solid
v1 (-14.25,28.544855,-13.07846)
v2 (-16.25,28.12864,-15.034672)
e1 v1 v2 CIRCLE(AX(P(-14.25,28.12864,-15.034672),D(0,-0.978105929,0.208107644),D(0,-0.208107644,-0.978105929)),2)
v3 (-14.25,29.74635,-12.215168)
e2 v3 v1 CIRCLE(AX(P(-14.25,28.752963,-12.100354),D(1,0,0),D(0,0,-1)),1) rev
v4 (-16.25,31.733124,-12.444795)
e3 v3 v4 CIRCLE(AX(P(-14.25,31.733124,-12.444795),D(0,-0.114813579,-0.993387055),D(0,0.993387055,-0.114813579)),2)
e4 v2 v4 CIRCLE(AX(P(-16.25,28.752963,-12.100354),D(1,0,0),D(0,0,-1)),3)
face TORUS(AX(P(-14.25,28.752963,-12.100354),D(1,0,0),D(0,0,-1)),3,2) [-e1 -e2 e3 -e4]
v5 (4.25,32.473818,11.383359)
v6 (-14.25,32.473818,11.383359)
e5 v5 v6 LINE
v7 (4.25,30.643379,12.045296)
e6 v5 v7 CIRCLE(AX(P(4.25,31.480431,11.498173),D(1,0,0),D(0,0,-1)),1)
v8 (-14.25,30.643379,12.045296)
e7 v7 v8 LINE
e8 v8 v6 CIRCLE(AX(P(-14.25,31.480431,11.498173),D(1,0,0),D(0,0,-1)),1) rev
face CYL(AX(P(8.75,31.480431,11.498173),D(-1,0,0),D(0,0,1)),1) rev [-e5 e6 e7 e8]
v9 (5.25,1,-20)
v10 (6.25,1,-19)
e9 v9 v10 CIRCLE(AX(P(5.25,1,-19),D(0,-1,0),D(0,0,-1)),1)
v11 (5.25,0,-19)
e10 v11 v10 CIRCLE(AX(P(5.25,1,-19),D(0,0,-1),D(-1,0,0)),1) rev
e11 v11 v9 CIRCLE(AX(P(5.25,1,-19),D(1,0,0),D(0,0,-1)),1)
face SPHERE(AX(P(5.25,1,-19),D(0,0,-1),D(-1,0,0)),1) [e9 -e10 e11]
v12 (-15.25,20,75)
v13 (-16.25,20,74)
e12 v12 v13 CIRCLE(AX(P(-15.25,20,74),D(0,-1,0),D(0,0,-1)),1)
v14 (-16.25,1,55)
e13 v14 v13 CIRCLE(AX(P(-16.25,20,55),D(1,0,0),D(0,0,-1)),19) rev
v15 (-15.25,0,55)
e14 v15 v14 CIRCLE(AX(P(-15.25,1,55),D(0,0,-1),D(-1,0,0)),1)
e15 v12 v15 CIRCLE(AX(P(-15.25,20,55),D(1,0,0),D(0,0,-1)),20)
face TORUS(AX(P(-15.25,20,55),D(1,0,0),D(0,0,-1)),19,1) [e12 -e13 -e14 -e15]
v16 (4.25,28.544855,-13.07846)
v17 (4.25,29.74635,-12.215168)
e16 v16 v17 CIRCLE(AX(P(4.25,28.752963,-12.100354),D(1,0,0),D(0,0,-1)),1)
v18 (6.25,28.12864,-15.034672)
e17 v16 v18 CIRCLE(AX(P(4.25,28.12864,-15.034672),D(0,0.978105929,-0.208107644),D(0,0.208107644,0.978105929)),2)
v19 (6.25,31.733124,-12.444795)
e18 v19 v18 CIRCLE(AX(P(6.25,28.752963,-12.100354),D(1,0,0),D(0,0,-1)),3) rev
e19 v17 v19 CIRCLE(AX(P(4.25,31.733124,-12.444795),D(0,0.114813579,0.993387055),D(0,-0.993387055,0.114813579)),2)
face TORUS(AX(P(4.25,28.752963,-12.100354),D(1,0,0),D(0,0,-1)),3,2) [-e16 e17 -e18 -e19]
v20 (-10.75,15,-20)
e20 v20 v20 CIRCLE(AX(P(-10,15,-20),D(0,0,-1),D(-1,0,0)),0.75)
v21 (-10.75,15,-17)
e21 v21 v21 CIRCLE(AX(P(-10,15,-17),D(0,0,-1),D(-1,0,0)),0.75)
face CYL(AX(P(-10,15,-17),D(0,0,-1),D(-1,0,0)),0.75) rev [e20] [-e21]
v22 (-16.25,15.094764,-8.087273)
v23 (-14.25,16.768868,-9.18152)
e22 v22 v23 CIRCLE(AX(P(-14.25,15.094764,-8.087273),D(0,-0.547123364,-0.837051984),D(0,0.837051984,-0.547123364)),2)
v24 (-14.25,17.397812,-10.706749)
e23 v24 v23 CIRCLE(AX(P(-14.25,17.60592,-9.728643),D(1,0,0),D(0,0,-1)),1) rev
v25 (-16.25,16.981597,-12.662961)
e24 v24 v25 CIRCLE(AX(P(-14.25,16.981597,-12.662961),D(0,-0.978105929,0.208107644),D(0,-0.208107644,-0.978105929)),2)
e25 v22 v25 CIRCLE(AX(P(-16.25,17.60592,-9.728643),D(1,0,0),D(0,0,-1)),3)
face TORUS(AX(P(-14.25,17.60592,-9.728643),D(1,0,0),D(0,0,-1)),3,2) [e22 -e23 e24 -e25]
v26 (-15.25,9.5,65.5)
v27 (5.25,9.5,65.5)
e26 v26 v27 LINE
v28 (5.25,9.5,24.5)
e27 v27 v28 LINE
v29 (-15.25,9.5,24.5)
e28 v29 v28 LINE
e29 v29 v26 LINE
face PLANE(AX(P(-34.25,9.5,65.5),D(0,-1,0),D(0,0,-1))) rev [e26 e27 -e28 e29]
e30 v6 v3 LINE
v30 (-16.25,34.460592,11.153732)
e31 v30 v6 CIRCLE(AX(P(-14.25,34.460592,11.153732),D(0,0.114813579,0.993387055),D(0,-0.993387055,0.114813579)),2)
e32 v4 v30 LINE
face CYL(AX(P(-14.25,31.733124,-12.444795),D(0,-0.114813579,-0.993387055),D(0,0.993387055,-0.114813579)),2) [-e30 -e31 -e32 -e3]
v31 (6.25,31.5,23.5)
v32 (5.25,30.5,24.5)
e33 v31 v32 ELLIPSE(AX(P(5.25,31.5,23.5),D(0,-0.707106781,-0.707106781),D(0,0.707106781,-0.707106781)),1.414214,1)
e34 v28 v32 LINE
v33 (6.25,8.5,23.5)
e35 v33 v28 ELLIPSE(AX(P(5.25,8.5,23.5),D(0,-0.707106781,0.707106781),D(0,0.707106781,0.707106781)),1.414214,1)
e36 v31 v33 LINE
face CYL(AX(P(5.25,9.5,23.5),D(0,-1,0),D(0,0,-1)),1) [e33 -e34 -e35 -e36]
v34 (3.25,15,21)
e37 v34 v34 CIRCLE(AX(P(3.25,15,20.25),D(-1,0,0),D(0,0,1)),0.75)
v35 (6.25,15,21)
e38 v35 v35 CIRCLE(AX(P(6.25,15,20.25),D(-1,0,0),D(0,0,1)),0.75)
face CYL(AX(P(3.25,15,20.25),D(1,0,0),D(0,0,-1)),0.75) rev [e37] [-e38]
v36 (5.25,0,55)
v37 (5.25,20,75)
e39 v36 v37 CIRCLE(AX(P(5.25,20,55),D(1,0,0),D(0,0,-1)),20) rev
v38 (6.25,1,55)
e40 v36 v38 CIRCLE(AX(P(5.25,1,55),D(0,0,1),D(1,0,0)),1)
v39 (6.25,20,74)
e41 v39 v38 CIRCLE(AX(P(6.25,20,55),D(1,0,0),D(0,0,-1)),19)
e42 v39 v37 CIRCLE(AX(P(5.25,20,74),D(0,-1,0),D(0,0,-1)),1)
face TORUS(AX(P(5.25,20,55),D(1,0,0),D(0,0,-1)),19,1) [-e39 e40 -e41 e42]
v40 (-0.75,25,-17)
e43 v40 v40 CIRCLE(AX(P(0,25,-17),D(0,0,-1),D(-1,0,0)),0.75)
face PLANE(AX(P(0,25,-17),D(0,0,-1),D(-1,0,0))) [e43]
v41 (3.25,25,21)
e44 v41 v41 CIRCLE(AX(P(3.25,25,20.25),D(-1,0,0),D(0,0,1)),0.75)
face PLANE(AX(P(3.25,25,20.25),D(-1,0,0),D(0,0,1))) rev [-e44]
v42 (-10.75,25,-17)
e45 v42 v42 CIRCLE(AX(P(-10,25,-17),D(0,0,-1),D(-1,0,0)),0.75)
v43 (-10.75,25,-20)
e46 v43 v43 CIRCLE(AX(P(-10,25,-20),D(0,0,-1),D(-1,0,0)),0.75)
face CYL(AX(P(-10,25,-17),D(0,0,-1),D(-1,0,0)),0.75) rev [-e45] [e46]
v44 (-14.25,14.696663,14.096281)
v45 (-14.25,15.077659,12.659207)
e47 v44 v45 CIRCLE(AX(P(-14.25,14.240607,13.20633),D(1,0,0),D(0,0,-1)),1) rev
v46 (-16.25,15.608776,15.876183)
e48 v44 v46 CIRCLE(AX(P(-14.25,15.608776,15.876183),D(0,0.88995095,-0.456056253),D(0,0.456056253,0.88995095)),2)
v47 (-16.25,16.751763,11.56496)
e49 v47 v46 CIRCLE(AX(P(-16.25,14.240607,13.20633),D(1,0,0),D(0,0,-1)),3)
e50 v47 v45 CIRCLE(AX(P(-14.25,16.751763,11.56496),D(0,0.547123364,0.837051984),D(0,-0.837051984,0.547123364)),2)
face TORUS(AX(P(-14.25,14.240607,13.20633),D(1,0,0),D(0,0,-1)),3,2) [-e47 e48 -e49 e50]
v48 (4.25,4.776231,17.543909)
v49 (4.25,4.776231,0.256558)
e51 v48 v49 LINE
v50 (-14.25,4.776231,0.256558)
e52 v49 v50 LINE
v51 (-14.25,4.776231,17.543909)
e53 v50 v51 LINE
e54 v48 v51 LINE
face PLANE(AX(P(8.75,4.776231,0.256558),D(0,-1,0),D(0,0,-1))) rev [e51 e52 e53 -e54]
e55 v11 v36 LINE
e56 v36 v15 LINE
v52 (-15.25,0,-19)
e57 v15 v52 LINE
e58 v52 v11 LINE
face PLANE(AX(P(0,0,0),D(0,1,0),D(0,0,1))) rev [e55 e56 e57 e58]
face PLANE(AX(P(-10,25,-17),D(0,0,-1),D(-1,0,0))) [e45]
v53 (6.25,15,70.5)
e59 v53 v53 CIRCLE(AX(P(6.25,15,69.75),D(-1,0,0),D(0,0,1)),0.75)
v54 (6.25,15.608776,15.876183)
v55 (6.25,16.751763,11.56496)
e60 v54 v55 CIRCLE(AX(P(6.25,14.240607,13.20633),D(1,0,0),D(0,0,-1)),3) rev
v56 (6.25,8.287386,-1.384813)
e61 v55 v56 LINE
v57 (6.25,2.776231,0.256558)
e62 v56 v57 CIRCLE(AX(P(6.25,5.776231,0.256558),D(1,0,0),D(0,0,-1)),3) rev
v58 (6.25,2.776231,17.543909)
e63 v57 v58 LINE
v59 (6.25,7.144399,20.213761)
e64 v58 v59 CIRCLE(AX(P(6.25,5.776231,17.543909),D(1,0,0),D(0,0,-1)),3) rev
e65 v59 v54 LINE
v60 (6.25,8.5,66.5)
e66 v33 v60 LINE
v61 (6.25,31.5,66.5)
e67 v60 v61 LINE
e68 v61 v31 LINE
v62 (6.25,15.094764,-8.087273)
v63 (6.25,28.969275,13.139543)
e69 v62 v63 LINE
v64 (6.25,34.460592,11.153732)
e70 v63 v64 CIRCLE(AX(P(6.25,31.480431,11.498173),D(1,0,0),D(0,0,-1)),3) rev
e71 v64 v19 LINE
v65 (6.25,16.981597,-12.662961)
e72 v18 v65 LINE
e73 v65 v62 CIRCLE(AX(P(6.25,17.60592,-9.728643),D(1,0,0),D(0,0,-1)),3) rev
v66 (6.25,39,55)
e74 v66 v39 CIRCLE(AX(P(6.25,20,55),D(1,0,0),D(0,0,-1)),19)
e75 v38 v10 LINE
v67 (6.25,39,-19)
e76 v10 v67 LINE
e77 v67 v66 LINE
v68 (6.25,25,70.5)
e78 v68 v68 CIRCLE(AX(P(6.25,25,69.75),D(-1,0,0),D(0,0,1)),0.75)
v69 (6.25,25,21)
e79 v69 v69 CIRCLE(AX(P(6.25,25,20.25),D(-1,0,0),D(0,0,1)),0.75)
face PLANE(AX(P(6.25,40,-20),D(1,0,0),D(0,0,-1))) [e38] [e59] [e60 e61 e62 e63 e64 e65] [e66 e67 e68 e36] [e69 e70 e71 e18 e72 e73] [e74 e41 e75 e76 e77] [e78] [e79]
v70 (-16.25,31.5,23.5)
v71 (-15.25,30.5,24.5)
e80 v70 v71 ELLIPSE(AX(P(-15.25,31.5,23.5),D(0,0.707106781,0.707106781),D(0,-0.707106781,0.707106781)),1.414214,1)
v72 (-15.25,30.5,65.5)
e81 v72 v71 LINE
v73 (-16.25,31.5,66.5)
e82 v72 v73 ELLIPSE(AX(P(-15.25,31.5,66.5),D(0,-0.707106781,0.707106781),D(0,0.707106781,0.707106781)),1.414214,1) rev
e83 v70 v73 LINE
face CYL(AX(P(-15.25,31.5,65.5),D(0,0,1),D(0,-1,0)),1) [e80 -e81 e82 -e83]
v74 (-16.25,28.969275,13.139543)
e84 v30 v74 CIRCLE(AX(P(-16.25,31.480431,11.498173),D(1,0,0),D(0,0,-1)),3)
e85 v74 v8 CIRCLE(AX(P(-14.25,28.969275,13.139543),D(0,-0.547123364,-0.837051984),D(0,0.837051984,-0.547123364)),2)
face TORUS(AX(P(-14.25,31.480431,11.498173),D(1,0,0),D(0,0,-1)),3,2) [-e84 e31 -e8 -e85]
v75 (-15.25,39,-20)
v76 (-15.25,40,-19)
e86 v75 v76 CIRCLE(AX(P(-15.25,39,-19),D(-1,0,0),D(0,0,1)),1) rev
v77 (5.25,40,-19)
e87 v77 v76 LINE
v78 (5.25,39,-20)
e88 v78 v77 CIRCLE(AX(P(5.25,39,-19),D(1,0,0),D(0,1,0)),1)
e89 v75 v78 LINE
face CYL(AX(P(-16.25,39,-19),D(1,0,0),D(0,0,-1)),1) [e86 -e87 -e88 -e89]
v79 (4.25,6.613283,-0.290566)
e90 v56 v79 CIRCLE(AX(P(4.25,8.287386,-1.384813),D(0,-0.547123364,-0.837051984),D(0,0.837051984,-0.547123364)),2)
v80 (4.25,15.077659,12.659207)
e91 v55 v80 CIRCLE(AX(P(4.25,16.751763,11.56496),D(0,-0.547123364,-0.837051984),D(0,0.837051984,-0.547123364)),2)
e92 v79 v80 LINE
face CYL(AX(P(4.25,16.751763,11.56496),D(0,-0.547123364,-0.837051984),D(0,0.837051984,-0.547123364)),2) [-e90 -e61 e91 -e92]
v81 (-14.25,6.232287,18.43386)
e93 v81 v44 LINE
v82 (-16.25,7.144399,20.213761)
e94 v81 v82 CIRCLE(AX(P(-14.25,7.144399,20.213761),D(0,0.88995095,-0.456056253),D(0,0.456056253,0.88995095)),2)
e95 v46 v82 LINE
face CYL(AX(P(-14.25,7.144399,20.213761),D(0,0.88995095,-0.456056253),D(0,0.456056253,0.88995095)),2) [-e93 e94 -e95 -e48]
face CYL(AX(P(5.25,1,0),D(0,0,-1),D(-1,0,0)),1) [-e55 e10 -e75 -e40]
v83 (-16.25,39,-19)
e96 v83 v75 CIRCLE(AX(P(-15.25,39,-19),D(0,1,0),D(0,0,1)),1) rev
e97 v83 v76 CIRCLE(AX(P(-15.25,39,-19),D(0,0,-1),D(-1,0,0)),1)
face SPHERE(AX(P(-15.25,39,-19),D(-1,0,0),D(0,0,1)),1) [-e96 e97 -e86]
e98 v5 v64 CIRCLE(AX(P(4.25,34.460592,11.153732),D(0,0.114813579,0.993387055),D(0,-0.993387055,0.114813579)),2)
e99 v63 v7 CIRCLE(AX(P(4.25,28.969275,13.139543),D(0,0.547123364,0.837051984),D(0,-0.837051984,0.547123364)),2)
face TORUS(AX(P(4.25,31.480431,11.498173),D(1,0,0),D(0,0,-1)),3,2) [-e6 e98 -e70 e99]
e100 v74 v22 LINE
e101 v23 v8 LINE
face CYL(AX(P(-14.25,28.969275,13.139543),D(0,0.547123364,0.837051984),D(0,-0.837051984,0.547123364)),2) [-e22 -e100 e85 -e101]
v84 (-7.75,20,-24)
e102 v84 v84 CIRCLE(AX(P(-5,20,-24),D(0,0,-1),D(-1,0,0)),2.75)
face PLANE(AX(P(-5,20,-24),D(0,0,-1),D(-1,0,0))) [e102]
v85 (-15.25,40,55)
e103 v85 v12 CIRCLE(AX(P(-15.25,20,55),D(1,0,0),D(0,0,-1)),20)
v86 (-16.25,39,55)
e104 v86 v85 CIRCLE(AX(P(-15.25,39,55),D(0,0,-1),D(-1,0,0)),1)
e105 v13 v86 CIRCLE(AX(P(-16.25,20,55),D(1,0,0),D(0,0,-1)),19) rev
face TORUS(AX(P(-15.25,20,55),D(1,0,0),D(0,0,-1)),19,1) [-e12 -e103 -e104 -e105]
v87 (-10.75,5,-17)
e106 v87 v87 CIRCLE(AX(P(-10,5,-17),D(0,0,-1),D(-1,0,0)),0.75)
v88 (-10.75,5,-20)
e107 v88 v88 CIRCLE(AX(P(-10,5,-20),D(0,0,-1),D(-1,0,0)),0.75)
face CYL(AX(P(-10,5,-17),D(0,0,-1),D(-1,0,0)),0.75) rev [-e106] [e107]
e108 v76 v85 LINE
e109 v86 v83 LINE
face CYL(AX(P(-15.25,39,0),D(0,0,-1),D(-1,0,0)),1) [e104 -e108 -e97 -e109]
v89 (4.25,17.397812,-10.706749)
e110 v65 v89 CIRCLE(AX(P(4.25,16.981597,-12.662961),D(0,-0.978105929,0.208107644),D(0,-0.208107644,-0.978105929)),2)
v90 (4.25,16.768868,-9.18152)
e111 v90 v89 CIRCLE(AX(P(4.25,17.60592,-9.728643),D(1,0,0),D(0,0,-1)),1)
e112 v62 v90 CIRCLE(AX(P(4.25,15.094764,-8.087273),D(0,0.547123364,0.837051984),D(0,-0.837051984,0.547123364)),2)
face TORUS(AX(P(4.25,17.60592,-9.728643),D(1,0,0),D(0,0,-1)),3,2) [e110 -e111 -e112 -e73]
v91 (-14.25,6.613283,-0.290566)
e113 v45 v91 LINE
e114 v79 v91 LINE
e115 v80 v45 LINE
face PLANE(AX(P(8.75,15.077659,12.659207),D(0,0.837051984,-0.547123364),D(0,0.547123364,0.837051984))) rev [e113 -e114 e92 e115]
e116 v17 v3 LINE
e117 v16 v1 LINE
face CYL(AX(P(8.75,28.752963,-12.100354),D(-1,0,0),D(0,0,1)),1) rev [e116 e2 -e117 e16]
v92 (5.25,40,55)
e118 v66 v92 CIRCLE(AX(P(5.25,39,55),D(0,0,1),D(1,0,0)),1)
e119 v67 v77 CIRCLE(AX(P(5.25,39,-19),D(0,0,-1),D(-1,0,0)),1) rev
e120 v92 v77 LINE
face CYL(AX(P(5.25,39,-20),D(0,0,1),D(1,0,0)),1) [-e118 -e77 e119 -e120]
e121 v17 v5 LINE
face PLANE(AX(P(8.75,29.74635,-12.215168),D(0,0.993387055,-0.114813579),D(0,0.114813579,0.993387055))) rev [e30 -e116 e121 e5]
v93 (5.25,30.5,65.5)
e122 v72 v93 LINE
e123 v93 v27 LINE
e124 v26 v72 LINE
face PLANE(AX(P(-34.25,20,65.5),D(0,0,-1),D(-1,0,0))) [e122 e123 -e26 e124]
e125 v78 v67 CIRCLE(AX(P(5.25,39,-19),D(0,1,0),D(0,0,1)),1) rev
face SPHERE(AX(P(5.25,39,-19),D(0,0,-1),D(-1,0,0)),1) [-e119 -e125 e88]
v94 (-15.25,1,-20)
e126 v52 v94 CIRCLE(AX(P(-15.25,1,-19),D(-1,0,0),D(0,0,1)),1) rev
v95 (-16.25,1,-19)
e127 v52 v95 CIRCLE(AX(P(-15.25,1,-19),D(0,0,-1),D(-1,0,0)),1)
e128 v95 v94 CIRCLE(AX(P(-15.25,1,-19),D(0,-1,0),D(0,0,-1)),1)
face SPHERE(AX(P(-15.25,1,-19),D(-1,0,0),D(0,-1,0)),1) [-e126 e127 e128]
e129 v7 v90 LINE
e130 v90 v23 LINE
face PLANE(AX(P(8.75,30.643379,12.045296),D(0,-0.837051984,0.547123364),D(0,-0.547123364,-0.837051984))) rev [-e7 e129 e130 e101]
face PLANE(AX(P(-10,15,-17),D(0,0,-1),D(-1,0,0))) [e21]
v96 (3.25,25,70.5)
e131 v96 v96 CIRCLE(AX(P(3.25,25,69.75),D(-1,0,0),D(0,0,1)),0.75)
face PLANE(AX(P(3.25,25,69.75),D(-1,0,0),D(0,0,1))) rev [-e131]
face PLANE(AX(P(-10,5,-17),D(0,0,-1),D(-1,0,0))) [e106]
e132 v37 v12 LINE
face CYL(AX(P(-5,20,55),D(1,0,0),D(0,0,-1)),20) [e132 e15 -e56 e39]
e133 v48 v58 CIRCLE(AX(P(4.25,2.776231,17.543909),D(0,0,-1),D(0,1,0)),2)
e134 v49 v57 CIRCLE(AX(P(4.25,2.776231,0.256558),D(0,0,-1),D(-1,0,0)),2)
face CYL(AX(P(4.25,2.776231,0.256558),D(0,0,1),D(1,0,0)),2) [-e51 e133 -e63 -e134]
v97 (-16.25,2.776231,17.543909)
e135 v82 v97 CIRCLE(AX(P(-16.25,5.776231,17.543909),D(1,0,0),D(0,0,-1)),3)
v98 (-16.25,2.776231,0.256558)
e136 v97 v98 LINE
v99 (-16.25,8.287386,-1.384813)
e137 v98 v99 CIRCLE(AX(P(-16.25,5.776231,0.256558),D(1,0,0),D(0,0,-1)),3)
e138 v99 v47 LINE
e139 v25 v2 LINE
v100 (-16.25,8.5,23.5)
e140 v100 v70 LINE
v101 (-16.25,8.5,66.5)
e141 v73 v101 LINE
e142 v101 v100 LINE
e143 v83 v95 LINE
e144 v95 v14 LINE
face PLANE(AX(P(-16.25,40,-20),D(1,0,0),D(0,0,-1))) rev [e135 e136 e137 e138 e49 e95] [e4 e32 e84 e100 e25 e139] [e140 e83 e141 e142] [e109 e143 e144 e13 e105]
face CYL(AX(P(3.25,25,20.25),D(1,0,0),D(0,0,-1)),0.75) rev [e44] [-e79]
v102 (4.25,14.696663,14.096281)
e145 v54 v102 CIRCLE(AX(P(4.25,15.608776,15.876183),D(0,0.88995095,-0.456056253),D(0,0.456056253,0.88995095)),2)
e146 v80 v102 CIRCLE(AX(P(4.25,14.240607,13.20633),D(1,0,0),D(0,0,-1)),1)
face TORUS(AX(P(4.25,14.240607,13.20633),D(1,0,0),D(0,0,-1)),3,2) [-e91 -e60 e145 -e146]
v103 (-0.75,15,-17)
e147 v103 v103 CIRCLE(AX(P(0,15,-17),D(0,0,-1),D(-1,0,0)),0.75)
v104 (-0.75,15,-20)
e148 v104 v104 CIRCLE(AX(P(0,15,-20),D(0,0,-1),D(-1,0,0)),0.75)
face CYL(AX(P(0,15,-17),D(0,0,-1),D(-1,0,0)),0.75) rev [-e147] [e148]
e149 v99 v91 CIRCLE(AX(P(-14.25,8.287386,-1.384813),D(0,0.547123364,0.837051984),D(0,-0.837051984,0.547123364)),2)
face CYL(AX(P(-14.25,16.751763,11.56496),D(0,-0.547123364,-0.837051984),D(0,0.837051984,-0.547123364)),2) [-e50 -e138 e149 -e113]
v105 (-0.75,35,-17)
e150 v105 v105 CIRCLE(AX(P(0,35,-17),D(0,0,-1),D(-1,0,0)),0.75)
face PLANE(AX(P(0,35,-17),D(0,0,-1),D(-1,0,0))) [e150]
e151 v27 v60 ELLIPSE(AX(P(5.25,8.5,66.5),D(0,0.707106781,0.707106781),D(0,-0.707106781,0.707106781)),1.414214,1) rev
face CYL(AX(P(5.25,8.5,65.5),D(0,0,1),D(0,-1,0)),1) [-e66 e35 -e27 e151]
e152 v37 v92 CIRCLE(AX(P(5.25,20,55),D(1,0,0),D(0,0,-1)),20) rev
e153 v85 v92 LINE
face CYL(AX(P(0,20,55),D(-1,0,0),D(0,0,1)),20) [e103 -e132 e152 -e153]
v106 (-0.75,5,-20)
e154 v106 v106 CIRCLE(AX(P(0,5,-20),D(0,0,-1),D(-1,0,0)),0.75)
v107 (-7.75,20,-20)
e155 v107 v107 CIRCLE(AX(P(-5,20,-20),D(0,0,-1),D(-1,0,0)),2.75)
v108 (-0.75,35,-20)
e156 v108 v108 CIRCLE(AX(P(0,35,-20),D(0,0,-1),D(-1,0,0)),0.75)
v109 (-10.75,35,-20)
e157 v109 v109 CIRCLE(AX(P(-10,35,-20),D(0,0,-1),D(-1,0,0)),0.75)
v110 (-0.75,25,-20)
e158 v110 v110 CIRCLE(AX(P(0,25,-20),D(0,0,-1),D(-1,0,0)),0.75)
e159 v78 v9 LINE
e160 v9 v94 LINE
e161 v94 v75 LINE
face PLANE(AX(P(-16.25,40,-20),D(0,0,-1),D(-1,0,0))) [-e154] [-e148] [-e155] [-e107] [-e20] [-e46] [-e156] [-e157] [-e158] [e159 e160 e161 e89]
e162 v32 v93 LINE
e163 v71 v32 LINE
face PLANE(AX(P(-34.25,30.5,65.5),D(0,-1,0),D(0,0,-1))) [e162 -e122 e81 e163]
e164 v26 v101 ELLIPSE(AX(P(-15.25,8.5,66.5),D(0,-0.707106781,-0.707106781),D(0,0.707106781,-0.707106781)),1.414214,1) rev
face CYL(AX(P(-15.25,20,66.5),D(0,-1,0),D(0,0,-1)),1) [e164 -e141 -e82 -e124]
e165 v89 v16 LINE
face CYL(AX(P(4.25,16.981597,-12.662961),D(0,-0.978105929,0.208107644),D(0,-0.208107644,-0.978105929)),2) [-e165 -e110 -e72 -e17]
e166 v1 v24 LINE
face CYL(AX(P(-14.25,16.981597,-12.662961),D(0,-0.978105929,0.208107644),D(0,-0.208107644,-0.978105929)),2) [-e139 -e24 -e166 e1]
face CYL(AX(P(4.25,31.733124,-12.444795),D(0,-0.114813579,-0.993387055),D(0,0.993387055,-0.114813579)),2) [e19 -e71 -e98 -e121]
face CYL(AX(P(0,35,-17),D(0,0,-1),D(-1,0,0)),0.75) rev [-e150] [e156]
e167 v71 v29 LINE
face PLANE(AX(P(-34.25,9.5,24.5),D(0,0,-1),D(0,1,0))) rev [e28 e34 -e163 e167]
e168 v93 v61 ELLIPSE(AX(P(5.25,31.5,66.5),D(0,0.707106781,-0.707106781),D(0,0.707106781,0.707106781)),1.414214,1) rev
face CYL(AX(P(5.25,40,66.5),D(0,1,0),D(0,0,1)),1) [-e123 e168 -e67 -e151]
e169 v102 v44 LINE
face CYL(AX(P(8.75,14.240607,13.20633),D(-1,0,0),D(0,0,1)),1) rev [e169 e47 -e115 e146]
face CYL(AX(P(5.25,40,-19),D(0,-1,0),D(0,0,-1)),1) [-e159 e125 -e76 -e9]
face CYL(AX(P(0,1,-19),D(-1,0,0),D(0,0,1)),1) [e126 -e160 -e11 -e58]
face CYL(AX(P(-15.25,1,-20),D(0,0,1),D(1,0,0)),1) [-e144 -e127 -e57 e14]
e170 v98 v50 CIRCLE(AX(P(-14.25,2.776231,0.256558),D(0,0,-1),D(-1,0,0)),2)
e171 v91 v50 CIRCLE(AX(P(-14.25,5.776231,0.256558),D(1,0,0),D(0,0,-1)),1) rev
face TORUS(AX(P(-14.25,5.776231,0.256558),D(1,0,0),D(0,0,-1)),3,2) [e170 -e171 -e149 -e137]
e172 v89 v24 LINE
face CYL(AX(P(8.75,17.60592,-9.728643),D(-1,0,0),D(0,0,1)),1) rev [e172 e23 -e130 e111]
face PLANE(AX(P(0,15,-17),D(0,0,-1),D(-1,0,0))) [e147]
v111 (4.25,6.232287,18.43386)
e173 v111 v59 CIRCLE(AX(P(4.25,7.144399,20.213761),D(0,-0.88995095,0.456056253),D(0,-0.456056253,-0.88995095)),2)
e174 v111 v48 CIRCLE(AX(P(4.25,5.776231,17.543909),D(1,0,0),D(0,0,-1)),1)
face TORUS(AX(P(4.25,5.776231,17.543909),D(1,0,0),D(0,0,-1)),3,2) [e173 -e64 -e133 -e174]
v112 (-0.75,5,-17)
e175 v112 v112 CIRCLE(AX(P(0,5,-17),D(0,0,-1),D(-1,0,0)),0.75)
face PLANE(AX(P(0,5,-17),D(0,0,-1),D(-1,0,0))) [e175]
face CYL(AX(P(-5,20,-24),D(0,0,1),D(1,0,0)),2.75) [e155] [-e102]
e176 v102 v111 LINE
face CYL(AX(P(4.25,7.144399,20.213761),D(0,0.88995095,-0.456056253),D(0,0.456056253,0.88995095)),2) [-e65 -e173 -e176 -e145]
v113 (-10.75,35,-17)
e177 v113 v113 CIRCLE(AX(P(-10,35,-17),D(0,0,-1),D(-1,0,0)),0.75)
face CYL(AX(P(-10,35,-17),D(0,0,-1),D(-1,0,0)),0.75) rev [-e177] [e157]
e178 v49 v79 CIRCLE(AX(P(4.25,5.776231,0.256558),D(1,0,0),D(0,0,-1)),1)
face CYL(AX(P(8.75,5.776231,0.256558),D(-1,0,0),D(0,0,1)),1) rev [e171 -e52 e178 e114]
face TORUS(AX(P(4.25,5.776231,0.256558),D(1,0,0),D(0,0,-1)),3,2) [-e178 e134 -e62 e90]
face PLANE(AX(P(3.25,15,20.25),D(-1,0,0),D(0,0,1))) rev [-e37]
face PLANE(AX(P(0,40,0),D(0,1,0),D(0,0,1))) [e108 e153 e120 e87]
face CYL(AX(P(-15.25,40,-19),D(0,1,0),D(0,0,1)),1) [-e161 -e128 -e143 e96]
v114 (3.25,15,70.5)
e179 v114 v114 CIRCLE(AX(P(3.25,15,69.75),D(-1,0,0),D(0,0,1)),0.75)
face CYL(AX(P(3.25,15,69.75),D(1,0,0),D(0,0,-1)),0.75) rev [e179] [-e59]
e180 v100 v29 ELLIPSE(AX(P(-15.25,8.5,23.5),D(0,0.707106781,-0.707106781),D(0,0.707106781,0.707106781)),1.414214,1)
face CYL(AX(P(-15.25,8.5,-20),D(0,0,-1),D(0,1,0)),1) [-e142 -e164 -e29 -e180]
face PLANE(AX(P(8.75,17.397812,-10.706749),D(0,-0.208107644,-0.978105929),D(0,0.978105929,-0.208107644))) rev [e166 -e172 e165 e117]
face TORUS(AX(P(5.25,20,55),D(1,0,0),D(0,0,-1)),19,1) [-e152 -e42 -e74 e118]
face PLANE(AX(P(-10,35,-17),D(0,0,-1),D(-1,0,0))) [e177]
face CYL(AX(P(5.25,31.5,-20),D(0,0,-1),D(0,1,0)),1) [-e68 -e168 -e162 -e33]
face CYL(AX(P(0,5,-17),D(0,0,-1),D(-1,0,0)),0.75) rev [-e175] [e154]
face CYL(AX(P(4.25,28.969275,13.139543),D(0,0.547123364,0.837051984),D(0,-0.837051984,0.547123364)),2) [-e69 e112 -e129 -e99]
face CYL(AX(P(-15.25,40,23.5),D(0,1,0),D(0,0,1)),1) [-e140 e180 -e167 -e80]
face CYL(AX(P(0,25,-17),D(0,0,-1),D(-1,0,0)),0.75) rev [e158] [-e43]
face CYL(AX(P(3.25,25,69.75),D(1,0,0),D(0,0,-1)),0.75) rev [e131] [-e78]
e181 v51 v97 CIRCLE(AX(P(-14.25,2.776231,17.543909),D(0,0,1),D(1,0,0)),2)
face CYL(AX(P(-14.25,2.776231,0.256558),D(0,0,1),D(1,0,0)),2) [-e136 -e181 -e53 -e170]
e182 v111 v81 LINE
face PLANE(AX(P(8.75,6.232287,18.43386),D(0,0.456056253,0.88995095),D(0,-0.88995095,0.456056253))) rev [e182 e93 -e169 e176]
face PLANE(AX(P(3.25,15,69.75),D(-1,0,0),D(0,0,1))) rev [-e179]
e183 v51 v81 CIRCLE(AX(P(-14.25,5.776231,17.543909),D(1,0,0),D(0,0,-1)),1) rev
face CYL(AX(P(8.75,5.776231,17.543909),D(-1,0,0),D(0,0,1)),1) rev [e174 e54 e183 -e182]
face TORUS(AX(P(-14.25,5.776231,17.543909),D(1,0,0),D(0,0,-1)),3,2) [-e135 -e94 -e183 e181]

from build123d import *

# Parameters (mm, degrees)
MBODY_DEPTH        = 40
SKETCH5_R          = 0.75
FRONTSCREWS_DEPTH  = 3
SKETCH7_R          = 2.75
GUIDKNOB_DEPTH     = 4
SERVOCUT_DEPTH     = 40.5
ROUNDEND_R         = 20
SKETCH15_R         = 0.75
SERVOSCREWS_DEPTH  = 3
EDGES1MM_R         = 1
CUT_EXTRUDE2_DEPTH = 25
FILLET5_R          = 2


with BuildPart() as part:
    # Sketch4 → MBODY (new body)
    with BuildSketch(Plane(origin=(0, 0, 0), x_dir=(1, 0, 0), z_dir=(0, 1, 0))):
        Polygon((-5, 20), (-16.25, 20), (-16.25, -75), (-5, -75), (6.25, -75), (6.25, 20), align=None)
    extrude(amount=MBODY_DEPTH)

    # Sketch5 → FrontScrews (cut)
    with BuildSketch(Plane(origin=(0, 0, -20), x_dir=(-1, 0, 0), z_dir=(0, 0, -1))):
        with Locations((0, 5)):
            Circle(SKETCH5_R)
        with Locations((10, 5)):
            Circle(SKETCH5_R)
        with Locations((10, 15)):
            Circle(SKETCH5_R)
        with Locations((0, 15)):
            Circle(SKETCH5_R)
        with Locations((0, 25)):
            Circle(SKETCH5_R)
        with Locations((10, 25)):
            Circle(SKETCH5_R)
        with Locations((10, 35)):
            Circle(SKETCH5_R)
        with Locations((0, 35)):
            Circle(SKETCH5_R)
    extrude(amount=-FRONTSCREWS_DEPTH, mode=Mode.SUBTRACT)

    # Sketch7 → GUIDKNOB (add)
    with BuildSketch(Plane(origin=(0, 0, -20), x_dir=(-1, 0, 0), z_dir=(0, 0, -1))):
        with Locations((5, 20)):
            Circle(SKETCH7_R)
    extrude(amount=GUIDKNOB_DEPTH)

    # Sketch10 → ServoCut (cut)
    with BuildSketch(Plane(origin=(6.25, 0, 0), x_dir=(0, 0, -1), z_dir=(1, 0, 0))):
        Polygon((-65.5, 20), (-65.5, 30.5), (-24.5, 30.5), (-24.5, 9.5), (-65.5, 9.5), align=None)
    extrude(amount=-SERVOCUT_DEPTH, mode=Mode.SUBTRACT)

    # RoundEnd
    roundend_edges = [part.edges().sort_by_distance(p)[0] for p in [
        (-5, 0, 75),
        (-5, 40, 75),
    ]]
    fillet(roundend_edges, radius=ROUNDEND_R - 0.0001)  # a hair under: the kernel refuses the full size

    # Sketch15 → ServoScrews (cut)
    with BuildSketch(Plane(origin=(6.25, 33.75, 0), x_dir=(0, 1, 0), z_dir=(-1, 0, 0))):
        with Locations(Location((-18.75, -69.75, 0), (0, 0, 270))):
            Circle(SKETCH15_R)
        with Locations(Location((-8.75, -69.75, 0), (0, 0, 270))):
            Circle(SKETCH15_R)
        with Locations(Location((-8.75, -20.25, 0), (0, 0, 270))):
            Circle(SKETCH15_R)
        with Locations(Location((-18.75, -20.25, 0), (0, 0, 270))):
            Circle(SKETCH15_R)
    extrude(amount=SERVOSCREWS_DEPTH, mode=Mode.SUBTRACT)

    # EDGES1MM
    edges1mm_edges = [part.edges().sort_by_distance(p)[0] for p in [
        (-16.25, 20, -20),
        (6.25, 20, -20),
        (6.25, 40, 17.50005),
        (-5, 40, -20),
        (-16.25, 40, 17.50005),
        (6.25, 20, 65.5),
        (6.25, 30.5, 45),
        (-16.25, 20, 24.5),
        (-16.25, 9.5, 45),
        (-16.25, 20, 65.5),
        (-16.25, 30.5, 45),
        (-5, 0, -20),
        (6.25, 9.5, 45),
        (6.25, 20, 24.5),
        (6.25, 0, 17.50005),
        (6.25, 34.142164913, 69.142164913),
        (6.25, 5.857835087, 69.142164913),
        (-16.25, 34.142164913, 69.142164913),
        (-16.25, 5.857835087, 69.142164913),
        (-16.25, 0, 17.50005),
    ]]
    fillet(edges1mm_edges, radius=EDGES1MM_R)

    # Sketch20 → Cut-Extrude2 (cut)
    with BuildSketch(Plane.ZY.offset(16.25)):
        with BuildLine():
            Line((-12.215168046, 29.74634987), (11.383359391, 32.473817865))
            ThreePointArc((11.383359391, 32.473817865), (12.438571666, 31.820504762), (12.045296334, 30.643378825))
            Line((12.045296334, 30.643378825), (-9.181519802, 16.768867719))
            ThreePointArc((-9.181519802, 16.768867719), (-10.109863888, 16.681435652), (-10.706749095, 17.397812059))
            Line((-10.706749095, 17.397812059), (-13.078460395, 28.54485517))
            ThreePointArc((-13.078460395, 28.54485517), (-12.91246015, 29.33647319), (-12.215168046, 29.74634987))
        make_face()
        with BuildLine():
            Line((12.659206955, 15.077659132), (-0.290565805, 6.613282524))
            ThreePointArc((-0.290565805, 6.613282524), (-0.701840058, 5.490794018), (0.256557559, 4.776230539))
            Line((0.256557559, 4.776230539), (17.543908561, 4.776230539))
            ThreePointArc((17.543908561, 4.776230539), (18.397154203, 5.254721313), (18.433859511, 6.232286792))
            Line((18.433859511, 6.232286792), (14.09628127, 14.696663401))
            ThreePointArc((14.09628127, 14.696663401), (13.462596051, 15.207213518), (12.659206955, 15.077659132))
        make_face()
    extrude(amount=-CUT_EXTRUDE2_DEPTH, mode=Mode.SUBTRACT)

    # Fillet5
    fillet5_edges = [part.edges().sort_by_distance(p)[0] for p in [
        (6.25, 31.110083867, -0.415904328),
        (6.25, 29.33647319, -12.91246015),
        (6.25, 22.971333615, -11.892604745),
        (6.25, 16.681435652, -10.109863888),
        (6.25, 23.706123272, 1.431888266),
        (6.25, 31.820504762, 12.438571666),
        (6.25, 10.845470828, 6.184320575),
        (6.25, 5.490794018, -0.701840058),
        (6.25, 4.776230539, 8.90023306),
        (6.25, 5.254721313, 18.397154203),
        (6.25, 10.464475096, 16.26507039),
        (6.25, 15.207213518, 13.462596051),
        (-16.25, 15.207213518, 13.462596051),
        (-16.25, 10.845470828, 6.184320575),
        (-16.25, 5.490794018, -0.701840058),
        (-16.25, 4.776230539, 8.90023306),
        (-16.25, 5.254721313, 18.397154203),
        (-16.25, 10.464475096, 16.26507039),
        (-16.25, 31.820504762, 12.438571666),
        (-16.25, 31.110083867, -0.415904328),
        (-16.25, 29.33647319, -12.91246015),
        (-16.25, 22.971333615, -11.892604745),
        (-16.25, 16.681435652, -10.109863888),
        (-16.25, 23.706123272, 1.431888266),
    ]]
    fillet(fillet5_edges, radius=FILLET5_R)


solid = part.part
